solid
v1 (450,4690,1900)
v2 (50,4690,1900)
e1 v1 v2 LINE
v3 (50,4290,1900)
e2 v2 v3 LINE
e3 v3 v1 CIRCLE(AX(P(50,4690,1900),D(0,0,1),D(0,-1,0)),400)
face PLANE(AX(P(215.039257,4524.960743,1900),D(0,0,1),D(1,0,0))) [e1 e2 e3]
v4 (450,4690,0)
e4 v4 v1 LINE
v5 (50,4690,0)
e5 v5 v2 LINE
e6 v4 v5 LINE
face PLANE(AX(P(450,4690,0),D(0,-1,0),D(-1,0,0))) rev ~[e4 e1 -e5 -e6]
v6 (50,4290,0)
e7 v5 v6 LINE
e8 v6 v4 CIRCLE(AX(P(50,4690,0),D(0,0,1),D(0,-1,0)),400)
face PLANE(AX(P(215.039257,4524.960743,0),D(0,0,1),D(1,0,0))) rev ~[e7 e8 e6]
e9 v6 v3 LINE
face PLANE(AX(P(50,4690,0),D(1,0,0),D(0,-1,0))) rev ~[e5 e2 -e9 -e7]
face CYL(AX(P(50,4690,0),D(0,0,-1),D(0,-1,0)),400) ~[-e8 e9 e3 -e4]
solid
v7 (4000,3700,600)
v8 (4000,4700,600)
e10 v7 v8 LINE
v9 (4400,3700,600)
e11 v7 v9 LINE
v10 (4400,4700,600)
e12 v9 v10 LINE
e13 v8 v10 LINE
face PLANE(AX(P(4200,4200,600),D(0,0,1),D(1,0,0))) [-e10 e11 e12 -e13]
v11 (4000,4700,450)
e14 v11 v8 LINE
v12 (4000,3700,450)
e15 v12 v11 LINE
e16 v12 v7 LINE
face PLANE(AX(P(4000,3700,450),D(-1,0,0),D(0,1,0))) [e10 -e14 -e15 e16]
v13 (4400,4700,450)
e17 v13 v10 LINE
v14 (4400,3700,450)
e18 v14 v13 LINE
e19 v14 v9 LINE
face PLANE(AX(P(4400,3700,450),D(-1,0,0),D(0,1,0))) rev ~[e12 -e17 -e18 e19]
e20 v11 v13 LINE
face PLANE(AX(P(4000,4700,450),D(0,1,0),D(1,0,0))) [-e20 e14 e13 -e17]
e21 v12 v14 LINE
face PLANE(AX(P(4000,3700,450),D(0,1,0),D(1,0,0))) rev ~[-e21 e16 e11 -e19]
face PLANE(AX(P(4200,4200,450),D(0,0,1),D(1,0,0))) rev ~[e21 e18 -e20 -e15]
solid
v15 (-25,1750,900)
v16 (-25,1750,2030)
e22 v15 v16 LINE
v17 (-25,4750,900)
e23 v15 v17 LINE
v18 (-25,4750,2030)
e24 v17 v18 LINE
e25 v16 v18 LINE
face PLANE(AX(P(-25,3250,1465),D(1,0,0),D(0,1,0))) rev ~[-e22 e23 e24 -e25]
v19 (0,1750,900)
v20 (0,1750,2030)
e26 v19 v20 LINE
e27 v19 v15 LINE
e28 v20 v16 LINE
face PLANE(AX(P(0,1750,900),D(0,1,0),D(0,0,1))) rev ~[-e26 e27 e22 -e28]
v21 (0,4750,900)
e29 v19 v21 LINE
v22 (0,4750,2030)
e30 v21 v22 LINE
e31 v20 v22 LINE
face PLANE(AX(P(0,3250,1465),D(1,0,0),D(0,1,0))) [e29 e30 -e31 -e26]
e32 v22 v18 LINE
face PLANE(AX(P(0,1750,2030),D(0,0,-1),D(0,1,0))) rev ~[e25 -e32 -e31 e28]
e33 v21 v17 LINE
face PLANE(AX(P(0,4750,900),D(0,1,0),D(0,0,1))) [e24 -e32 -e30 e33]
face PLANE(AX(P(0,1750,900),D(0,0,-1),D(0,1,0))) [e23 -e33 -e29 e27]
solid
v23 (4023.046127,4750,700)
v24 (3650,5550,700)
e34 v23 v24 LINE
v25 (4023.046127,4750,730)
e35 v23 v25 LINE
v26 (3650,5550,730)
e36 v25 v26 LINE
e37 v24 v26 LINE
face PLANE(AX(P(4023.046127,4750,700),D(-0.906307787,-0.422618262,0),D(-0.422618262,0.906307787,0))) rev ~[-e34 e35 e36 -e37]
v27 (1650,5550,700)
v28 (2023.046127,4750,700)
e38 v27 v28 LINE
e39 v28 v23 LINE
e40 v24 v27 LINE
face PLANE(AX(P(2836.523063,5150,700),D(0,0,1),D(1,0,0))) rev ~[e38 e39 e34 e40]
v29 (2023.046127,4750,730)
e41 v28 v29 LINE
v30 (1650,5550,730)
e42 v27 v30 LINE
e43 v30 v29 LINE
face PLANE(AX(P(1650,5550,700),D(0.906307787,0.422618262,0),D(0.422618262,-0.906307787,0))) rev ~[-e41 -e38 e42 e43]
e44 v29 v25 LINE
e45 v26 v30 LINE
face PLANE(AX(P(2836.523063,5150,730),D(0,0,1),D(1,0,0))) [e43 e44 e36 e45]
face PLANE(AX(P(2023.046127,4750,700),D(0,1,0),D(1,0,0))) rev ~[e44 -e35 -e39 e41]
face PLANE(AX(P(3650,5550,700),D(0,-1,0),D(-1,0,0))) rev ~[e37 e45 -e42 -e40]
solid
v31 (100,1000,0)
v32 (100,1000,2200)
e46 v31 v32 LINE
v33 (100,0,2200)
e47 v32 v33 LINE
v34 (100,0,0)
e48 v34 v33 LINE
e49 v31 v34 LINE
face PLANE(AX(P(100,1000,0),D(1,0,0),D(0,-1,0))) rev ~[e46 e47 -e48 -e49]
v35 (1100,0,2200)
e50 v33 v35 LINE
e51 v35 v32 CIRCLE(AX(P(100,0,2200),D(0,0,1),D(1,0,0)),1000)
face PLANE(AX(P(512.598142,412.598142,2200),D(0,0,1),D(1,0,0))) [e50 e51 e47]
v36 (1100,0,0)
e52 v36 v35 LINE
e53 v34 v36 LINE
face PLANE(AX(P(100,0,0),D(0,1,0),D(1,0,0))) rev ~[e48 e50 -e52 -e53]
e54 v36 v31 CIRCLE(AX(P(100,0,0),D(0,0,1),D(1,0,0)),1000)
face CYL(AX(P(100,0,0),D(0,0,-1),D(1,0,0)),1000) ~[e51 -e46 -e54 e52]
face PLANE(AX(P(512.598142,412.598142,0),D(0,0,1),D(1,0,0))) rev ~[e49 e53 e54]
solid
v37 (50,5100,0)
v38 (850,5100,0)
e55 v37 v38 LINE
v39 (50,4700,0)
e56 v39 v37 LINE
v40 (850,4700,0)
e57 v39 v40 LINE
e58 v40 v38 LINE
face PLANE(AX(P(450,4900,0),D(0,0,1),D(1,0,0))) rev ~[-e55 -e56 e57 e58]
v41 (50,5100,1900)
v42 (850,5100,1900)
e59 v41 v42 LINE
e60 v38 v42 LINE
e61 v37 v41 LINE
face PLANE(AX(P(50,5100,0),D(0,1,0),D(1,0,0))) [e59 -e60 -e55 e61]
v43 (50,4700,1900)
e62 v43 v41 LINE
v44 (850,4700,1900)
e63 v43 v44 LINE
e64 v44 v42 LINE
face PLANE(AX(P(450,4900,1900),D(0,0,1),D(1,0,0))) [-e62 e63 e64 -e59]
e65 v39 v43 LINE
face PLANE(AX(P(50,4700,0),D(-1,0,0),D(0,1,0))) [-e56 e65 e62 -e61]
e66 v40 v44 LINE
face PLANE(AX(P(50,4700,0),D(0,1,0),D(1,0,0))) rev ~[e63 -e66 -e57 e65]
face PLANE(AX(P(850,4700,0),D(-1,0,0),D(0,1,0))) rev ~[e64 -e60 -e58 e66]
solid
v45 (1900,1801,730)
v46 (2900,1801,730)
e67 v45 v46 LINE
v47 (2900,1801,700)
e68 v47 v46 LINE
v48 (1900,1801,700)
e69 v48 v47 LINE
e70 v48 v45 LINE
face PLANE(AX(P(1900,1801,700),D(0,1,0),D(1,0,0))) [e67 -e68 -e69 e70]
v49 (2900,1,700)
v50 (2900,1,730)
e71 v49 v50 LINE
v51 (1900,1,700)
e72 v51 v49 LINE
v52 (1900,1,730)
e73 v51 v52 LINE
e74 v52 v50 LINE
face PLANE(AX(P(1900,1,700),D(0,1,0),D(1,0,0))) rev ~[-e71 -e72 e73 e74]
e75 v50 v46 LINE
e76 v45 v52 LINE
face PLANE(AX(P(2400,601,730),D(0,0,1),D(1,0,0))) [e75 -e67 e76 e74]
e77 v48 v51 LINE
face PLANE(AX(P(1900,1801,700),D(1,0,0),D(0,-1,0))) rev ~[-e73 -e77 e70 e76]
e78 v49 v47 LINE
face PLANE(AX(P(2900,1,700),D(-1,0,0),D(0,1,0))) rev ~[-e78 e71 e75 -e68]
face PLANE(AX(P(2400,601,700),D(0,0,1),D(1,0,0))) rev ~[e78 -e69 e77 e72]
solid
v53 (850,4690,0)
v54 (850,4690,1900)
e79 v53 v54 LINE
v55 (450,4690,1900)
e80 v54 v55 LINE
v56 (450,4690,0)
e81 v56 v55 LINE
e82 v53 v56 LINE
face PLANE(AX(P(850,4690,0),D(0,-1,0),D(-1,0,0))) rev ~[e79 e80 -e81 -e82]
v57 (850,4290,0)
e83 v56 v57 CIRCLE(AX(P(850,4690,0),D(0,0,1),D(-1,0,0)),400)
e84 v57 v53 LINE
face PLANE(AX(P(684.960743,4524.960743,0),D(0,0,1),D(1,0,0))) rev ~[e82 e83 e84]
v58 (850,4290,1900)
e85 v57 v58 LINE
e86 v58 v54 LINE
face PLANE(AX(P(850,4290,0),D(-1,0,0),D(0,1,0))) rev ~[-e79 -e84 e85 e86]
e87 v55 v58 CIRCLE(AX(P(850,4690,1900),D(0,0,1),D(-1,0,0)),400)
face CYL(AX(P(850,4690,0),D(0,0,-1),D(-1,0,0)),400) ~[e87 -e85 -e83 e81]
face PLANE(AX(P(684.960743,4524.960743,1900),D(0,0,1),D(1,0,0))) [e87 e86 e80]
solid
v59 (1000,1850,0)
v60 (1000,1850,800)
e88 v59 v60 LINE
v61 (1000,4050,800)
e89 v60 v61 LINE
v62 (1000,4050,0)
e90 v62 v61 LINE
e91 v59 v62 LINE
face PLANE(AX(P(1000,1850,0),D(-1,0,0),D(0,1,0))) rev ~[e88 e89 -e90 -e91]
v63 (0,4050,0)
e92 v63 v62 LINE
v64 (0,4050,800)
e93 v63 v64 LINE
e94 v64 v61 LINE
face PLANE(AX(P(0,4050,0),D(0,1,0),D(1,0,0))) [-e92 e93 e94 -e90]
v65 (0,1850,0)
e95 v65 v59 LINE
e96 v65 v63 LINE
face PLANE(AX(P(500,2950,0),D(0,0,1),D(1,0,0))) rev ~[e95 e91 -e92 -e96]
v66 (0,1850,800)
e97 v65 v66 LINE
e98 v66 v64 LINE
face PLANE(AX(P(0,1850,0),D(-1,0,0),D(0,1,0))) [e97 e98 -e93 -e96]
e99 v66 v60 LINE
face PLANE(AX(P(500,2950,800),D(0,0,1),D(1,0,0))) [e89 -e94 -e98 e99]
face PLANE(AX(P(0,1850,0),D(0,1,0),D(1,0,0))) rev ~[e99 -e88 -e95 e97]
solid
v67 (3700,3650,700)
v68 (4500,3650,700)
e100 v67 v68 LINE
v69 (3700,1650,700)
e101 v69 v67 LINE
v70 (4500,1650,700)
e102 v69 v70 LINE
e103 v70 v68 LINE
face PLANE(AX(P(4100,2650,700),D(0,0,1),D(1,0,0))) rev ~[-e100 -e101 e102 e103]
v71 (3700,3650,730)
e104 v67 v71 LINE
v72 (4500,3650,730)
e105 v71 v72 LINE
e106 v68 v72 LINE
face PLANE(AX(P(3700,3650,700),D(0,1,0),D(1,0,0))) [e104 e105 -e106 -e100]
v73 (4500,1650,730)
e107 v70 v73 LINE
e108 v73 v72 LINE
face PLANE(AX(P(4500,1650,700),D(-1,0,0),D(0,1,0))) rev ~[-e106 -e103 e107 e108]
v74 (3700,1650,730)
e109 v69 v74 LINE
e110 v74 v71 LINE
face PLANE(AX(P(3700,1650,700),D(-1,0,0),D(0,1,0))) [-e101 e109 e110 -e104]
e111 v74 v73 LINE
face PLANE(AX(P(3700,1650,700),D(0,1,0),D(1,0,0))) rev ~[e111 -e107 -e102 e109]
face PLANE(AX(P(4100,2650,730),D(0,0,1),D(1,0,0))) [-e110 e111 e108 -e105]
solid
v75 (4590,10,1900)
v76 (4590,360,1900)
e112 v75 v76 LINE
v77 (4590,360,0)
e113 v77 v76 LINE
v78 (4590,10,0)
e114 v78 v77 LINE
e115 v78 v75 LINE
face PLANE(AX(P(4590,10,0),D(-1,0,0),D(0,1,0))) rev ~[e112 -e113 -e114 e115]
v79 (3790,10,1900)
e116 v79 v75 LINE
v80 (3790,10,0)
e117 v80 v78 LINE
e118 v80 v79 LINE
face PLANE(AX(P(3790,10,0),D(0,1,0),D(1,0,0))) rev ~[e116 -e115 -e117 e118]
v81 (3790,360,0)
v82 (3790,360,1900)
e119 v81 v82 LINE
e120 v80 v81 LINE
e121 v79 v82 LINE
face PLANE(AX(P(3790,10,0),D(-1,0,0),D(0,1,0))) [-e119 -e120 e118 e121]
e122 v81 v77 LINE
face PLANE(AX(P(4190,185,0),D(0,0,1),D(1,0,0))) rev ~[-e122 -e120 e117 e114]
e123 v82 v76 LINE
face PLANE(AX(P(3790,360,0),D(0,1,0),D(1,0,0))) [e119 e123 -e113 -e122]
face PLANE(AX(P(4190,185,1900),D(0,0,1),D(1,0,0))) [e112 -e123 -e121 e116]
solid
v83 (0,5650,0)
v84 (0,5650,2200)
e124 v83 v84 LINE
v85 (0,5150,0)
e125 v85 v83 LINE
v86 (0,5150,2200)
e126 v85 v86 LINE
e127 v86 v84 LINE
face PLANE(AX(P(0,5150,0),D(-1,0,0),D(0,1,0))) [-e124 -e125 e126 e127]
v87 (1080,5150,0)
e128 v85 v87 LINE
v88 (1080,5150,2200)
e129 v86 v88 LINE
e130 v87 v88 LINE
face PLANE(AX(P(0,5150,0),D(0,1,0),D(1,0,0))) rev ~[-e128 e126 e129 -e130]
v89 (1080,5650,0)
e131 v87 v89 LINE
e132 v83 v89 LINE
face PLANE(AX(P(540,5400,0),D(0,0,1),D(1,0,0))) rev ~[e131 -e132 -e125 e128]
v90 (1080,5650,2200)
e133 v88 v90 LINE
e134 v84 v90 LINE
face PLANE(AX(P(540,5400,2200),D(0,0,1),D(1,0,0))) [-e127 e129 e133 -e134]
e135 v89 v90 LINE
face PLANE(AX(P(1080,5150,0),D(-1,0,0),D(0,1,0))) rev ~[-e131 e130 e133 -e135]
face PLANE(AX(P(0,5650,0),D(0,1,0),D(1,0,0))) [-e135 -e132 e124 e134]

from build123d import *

# Parameters (mm, degrees)
F5_DEPTH  = 2200
F1_W      = 1080
F1_H      = 500
F6_DEPTH  = 2200
F7_START  = 700
F4_W      = 800
F4_H      = 2000
F7_DEPTH  = 30
F8_START  = 450
F4_W_2    = 400
F4_H_2    = 1000
F8_DEPTH  = 150
F9_START  = 700
F2_W      = 1000
F2_H      = 1200
F2_H_2    = 600
F9_DEPTH  = 30
F11_START = 700
F11_DEPTH = 30
F12_W     = 3000
F12_H     = 1130
F13_DEPTH = 25
F10_W     = 1000
F10_H     = 2200
F14_DEPTH = 800
F15_W     = 800
F15_H     = 400
F16_DEPTH = 1900
F15_H_2   = 350
F18_DEPTH = 1900


# Not quite as in the source:
# - a feature names something its author has since deleted; it is built from what else it names


with BuildPart() as f5:
    # F3 (on Top) → F5 (new body)
    with BuildSketch(Plane.XY):
        with BuildLine():
            Line((100, 0), (1100, 0))
            ThreePointArc((1100, 0), (807.1067811865, 707.1067811865), (100, 1000))
            Line((100, 1000), (100, 0))
        make_face()
    extrude(amount=F5_DEPTH)


with BuildPart() as f6:
    # F1 (on Top) → F6 (new body)
    with BuildSketch(Plane.XY):
        with Locations((540, 5400)):
            Rectangle(F1_W, F1_H)
    extrude(amount=F6_DEPTH)


with BuildPart() as f7:
    # F4 (on Top) → F7 (new body)
    with BuildSketch(Plane.XY.offset(F7_START)):
        with Locations((4100, 2650)):
            Rectangle(F4_W, F4_H)
    extrude(amount=F7_DEPTH)


with BuildPart() as f8:
    # F4 (on Top) → F8 (new body)
    with BuildSketch(Plane.XY.offset(F8_START)):
        with Locations((4200, 4200)):
            Rectangle(F4_W_2, F4_H_2)
    extrude(amount=F8_DEPTH)


with BuildPart() as f9:
    # F2 (on Top) → F9 (new body)
    with BuildSketch(Plane.XY.offset(F9_START)):
        with Locations((2400, 601)):
            Rectangle(F2_W, F2_H)
        with Locations((2400, 1501)):
            Rectangle(F2_W, F2_H_2)
    extrude(amount=F9_DEPTH)


with BuildPart() as f11:
    # F4 (on Top) → F11 (new body)
    with BuildSketch(Plane.XY.offset(F11_START)):
        Polygon((3650, 5550), (1650, 5550), (2023.046126524, 4750), (4023.046126524, 4750), align=None)
    extrude(amount=F11_DEPTH)


with BuildPart() as f13:
    # F12 (on Right) → F13 (new body)
    with BuildSketch(Plane.YZ):
        with Locations((3250, 1465)):
            Rectangle(F12_W, F12_H)
    extrude(amount=-F13_DEPTH)


with BuildPart() as f14:
    # F10 (on Top) → F14 (new body)
    with BuildSketch(Plane.XY):
        with Locations((500, 2950)):
            Rectangle(F10_W, F10_H)
    extrude(amount=F14_DEPTH)


with BuildPart() as f16:
    # F15 (on Top) → F16 (new body)
    with BuildSketch(Plane.XY):
        with Locations((450, 4900)):
            Rectangle(F15_W, F15_H)
    extrude(amount=F16_DEPTH)


with BuildPart() as f16b:
    # F15 (on Top) → F16, piece 2 (new body)
    with BuildSketch(Plane.XY):
        with Locations((4190, 185)):
            Rectangle(F15_W, F15_H_2)
    extrude(amount=F16_DEPTH)


with BuildPart() as f18:
    # F17 (on Top) → F18 (new body)
    with BuildSketch(Plane.XY):
        with BuildLine():
            Line((850, 4690), (450, 4690))
            ThreePointArc((450, 4690), (567.1572875254, 4407.1572875254), (850, 4290))
            Line((850, 4290), (850, 4690))
        make_face()
    extrude(amount=F18_DEPTH)

    # F17 (on Top) → F18, piece 2 (join)
    with BuildSketch(Plane.XY):
        with BuildLine():
            Line((450, 4690), (50, 4690))
            Line((50, 4690), (50, 4290))
            ThreePointArc((50, 4290), (332.8427124746, 4407.1572875254), (450, 4690))
        make_face()
    extrude(amount=F18_DEPTH)


solid = Compound([f5.part, f6.part, f7.part, f8.part, f9.part, f11.part, f13.part, f14.part, f16.part, f16b.part, f18.part])
